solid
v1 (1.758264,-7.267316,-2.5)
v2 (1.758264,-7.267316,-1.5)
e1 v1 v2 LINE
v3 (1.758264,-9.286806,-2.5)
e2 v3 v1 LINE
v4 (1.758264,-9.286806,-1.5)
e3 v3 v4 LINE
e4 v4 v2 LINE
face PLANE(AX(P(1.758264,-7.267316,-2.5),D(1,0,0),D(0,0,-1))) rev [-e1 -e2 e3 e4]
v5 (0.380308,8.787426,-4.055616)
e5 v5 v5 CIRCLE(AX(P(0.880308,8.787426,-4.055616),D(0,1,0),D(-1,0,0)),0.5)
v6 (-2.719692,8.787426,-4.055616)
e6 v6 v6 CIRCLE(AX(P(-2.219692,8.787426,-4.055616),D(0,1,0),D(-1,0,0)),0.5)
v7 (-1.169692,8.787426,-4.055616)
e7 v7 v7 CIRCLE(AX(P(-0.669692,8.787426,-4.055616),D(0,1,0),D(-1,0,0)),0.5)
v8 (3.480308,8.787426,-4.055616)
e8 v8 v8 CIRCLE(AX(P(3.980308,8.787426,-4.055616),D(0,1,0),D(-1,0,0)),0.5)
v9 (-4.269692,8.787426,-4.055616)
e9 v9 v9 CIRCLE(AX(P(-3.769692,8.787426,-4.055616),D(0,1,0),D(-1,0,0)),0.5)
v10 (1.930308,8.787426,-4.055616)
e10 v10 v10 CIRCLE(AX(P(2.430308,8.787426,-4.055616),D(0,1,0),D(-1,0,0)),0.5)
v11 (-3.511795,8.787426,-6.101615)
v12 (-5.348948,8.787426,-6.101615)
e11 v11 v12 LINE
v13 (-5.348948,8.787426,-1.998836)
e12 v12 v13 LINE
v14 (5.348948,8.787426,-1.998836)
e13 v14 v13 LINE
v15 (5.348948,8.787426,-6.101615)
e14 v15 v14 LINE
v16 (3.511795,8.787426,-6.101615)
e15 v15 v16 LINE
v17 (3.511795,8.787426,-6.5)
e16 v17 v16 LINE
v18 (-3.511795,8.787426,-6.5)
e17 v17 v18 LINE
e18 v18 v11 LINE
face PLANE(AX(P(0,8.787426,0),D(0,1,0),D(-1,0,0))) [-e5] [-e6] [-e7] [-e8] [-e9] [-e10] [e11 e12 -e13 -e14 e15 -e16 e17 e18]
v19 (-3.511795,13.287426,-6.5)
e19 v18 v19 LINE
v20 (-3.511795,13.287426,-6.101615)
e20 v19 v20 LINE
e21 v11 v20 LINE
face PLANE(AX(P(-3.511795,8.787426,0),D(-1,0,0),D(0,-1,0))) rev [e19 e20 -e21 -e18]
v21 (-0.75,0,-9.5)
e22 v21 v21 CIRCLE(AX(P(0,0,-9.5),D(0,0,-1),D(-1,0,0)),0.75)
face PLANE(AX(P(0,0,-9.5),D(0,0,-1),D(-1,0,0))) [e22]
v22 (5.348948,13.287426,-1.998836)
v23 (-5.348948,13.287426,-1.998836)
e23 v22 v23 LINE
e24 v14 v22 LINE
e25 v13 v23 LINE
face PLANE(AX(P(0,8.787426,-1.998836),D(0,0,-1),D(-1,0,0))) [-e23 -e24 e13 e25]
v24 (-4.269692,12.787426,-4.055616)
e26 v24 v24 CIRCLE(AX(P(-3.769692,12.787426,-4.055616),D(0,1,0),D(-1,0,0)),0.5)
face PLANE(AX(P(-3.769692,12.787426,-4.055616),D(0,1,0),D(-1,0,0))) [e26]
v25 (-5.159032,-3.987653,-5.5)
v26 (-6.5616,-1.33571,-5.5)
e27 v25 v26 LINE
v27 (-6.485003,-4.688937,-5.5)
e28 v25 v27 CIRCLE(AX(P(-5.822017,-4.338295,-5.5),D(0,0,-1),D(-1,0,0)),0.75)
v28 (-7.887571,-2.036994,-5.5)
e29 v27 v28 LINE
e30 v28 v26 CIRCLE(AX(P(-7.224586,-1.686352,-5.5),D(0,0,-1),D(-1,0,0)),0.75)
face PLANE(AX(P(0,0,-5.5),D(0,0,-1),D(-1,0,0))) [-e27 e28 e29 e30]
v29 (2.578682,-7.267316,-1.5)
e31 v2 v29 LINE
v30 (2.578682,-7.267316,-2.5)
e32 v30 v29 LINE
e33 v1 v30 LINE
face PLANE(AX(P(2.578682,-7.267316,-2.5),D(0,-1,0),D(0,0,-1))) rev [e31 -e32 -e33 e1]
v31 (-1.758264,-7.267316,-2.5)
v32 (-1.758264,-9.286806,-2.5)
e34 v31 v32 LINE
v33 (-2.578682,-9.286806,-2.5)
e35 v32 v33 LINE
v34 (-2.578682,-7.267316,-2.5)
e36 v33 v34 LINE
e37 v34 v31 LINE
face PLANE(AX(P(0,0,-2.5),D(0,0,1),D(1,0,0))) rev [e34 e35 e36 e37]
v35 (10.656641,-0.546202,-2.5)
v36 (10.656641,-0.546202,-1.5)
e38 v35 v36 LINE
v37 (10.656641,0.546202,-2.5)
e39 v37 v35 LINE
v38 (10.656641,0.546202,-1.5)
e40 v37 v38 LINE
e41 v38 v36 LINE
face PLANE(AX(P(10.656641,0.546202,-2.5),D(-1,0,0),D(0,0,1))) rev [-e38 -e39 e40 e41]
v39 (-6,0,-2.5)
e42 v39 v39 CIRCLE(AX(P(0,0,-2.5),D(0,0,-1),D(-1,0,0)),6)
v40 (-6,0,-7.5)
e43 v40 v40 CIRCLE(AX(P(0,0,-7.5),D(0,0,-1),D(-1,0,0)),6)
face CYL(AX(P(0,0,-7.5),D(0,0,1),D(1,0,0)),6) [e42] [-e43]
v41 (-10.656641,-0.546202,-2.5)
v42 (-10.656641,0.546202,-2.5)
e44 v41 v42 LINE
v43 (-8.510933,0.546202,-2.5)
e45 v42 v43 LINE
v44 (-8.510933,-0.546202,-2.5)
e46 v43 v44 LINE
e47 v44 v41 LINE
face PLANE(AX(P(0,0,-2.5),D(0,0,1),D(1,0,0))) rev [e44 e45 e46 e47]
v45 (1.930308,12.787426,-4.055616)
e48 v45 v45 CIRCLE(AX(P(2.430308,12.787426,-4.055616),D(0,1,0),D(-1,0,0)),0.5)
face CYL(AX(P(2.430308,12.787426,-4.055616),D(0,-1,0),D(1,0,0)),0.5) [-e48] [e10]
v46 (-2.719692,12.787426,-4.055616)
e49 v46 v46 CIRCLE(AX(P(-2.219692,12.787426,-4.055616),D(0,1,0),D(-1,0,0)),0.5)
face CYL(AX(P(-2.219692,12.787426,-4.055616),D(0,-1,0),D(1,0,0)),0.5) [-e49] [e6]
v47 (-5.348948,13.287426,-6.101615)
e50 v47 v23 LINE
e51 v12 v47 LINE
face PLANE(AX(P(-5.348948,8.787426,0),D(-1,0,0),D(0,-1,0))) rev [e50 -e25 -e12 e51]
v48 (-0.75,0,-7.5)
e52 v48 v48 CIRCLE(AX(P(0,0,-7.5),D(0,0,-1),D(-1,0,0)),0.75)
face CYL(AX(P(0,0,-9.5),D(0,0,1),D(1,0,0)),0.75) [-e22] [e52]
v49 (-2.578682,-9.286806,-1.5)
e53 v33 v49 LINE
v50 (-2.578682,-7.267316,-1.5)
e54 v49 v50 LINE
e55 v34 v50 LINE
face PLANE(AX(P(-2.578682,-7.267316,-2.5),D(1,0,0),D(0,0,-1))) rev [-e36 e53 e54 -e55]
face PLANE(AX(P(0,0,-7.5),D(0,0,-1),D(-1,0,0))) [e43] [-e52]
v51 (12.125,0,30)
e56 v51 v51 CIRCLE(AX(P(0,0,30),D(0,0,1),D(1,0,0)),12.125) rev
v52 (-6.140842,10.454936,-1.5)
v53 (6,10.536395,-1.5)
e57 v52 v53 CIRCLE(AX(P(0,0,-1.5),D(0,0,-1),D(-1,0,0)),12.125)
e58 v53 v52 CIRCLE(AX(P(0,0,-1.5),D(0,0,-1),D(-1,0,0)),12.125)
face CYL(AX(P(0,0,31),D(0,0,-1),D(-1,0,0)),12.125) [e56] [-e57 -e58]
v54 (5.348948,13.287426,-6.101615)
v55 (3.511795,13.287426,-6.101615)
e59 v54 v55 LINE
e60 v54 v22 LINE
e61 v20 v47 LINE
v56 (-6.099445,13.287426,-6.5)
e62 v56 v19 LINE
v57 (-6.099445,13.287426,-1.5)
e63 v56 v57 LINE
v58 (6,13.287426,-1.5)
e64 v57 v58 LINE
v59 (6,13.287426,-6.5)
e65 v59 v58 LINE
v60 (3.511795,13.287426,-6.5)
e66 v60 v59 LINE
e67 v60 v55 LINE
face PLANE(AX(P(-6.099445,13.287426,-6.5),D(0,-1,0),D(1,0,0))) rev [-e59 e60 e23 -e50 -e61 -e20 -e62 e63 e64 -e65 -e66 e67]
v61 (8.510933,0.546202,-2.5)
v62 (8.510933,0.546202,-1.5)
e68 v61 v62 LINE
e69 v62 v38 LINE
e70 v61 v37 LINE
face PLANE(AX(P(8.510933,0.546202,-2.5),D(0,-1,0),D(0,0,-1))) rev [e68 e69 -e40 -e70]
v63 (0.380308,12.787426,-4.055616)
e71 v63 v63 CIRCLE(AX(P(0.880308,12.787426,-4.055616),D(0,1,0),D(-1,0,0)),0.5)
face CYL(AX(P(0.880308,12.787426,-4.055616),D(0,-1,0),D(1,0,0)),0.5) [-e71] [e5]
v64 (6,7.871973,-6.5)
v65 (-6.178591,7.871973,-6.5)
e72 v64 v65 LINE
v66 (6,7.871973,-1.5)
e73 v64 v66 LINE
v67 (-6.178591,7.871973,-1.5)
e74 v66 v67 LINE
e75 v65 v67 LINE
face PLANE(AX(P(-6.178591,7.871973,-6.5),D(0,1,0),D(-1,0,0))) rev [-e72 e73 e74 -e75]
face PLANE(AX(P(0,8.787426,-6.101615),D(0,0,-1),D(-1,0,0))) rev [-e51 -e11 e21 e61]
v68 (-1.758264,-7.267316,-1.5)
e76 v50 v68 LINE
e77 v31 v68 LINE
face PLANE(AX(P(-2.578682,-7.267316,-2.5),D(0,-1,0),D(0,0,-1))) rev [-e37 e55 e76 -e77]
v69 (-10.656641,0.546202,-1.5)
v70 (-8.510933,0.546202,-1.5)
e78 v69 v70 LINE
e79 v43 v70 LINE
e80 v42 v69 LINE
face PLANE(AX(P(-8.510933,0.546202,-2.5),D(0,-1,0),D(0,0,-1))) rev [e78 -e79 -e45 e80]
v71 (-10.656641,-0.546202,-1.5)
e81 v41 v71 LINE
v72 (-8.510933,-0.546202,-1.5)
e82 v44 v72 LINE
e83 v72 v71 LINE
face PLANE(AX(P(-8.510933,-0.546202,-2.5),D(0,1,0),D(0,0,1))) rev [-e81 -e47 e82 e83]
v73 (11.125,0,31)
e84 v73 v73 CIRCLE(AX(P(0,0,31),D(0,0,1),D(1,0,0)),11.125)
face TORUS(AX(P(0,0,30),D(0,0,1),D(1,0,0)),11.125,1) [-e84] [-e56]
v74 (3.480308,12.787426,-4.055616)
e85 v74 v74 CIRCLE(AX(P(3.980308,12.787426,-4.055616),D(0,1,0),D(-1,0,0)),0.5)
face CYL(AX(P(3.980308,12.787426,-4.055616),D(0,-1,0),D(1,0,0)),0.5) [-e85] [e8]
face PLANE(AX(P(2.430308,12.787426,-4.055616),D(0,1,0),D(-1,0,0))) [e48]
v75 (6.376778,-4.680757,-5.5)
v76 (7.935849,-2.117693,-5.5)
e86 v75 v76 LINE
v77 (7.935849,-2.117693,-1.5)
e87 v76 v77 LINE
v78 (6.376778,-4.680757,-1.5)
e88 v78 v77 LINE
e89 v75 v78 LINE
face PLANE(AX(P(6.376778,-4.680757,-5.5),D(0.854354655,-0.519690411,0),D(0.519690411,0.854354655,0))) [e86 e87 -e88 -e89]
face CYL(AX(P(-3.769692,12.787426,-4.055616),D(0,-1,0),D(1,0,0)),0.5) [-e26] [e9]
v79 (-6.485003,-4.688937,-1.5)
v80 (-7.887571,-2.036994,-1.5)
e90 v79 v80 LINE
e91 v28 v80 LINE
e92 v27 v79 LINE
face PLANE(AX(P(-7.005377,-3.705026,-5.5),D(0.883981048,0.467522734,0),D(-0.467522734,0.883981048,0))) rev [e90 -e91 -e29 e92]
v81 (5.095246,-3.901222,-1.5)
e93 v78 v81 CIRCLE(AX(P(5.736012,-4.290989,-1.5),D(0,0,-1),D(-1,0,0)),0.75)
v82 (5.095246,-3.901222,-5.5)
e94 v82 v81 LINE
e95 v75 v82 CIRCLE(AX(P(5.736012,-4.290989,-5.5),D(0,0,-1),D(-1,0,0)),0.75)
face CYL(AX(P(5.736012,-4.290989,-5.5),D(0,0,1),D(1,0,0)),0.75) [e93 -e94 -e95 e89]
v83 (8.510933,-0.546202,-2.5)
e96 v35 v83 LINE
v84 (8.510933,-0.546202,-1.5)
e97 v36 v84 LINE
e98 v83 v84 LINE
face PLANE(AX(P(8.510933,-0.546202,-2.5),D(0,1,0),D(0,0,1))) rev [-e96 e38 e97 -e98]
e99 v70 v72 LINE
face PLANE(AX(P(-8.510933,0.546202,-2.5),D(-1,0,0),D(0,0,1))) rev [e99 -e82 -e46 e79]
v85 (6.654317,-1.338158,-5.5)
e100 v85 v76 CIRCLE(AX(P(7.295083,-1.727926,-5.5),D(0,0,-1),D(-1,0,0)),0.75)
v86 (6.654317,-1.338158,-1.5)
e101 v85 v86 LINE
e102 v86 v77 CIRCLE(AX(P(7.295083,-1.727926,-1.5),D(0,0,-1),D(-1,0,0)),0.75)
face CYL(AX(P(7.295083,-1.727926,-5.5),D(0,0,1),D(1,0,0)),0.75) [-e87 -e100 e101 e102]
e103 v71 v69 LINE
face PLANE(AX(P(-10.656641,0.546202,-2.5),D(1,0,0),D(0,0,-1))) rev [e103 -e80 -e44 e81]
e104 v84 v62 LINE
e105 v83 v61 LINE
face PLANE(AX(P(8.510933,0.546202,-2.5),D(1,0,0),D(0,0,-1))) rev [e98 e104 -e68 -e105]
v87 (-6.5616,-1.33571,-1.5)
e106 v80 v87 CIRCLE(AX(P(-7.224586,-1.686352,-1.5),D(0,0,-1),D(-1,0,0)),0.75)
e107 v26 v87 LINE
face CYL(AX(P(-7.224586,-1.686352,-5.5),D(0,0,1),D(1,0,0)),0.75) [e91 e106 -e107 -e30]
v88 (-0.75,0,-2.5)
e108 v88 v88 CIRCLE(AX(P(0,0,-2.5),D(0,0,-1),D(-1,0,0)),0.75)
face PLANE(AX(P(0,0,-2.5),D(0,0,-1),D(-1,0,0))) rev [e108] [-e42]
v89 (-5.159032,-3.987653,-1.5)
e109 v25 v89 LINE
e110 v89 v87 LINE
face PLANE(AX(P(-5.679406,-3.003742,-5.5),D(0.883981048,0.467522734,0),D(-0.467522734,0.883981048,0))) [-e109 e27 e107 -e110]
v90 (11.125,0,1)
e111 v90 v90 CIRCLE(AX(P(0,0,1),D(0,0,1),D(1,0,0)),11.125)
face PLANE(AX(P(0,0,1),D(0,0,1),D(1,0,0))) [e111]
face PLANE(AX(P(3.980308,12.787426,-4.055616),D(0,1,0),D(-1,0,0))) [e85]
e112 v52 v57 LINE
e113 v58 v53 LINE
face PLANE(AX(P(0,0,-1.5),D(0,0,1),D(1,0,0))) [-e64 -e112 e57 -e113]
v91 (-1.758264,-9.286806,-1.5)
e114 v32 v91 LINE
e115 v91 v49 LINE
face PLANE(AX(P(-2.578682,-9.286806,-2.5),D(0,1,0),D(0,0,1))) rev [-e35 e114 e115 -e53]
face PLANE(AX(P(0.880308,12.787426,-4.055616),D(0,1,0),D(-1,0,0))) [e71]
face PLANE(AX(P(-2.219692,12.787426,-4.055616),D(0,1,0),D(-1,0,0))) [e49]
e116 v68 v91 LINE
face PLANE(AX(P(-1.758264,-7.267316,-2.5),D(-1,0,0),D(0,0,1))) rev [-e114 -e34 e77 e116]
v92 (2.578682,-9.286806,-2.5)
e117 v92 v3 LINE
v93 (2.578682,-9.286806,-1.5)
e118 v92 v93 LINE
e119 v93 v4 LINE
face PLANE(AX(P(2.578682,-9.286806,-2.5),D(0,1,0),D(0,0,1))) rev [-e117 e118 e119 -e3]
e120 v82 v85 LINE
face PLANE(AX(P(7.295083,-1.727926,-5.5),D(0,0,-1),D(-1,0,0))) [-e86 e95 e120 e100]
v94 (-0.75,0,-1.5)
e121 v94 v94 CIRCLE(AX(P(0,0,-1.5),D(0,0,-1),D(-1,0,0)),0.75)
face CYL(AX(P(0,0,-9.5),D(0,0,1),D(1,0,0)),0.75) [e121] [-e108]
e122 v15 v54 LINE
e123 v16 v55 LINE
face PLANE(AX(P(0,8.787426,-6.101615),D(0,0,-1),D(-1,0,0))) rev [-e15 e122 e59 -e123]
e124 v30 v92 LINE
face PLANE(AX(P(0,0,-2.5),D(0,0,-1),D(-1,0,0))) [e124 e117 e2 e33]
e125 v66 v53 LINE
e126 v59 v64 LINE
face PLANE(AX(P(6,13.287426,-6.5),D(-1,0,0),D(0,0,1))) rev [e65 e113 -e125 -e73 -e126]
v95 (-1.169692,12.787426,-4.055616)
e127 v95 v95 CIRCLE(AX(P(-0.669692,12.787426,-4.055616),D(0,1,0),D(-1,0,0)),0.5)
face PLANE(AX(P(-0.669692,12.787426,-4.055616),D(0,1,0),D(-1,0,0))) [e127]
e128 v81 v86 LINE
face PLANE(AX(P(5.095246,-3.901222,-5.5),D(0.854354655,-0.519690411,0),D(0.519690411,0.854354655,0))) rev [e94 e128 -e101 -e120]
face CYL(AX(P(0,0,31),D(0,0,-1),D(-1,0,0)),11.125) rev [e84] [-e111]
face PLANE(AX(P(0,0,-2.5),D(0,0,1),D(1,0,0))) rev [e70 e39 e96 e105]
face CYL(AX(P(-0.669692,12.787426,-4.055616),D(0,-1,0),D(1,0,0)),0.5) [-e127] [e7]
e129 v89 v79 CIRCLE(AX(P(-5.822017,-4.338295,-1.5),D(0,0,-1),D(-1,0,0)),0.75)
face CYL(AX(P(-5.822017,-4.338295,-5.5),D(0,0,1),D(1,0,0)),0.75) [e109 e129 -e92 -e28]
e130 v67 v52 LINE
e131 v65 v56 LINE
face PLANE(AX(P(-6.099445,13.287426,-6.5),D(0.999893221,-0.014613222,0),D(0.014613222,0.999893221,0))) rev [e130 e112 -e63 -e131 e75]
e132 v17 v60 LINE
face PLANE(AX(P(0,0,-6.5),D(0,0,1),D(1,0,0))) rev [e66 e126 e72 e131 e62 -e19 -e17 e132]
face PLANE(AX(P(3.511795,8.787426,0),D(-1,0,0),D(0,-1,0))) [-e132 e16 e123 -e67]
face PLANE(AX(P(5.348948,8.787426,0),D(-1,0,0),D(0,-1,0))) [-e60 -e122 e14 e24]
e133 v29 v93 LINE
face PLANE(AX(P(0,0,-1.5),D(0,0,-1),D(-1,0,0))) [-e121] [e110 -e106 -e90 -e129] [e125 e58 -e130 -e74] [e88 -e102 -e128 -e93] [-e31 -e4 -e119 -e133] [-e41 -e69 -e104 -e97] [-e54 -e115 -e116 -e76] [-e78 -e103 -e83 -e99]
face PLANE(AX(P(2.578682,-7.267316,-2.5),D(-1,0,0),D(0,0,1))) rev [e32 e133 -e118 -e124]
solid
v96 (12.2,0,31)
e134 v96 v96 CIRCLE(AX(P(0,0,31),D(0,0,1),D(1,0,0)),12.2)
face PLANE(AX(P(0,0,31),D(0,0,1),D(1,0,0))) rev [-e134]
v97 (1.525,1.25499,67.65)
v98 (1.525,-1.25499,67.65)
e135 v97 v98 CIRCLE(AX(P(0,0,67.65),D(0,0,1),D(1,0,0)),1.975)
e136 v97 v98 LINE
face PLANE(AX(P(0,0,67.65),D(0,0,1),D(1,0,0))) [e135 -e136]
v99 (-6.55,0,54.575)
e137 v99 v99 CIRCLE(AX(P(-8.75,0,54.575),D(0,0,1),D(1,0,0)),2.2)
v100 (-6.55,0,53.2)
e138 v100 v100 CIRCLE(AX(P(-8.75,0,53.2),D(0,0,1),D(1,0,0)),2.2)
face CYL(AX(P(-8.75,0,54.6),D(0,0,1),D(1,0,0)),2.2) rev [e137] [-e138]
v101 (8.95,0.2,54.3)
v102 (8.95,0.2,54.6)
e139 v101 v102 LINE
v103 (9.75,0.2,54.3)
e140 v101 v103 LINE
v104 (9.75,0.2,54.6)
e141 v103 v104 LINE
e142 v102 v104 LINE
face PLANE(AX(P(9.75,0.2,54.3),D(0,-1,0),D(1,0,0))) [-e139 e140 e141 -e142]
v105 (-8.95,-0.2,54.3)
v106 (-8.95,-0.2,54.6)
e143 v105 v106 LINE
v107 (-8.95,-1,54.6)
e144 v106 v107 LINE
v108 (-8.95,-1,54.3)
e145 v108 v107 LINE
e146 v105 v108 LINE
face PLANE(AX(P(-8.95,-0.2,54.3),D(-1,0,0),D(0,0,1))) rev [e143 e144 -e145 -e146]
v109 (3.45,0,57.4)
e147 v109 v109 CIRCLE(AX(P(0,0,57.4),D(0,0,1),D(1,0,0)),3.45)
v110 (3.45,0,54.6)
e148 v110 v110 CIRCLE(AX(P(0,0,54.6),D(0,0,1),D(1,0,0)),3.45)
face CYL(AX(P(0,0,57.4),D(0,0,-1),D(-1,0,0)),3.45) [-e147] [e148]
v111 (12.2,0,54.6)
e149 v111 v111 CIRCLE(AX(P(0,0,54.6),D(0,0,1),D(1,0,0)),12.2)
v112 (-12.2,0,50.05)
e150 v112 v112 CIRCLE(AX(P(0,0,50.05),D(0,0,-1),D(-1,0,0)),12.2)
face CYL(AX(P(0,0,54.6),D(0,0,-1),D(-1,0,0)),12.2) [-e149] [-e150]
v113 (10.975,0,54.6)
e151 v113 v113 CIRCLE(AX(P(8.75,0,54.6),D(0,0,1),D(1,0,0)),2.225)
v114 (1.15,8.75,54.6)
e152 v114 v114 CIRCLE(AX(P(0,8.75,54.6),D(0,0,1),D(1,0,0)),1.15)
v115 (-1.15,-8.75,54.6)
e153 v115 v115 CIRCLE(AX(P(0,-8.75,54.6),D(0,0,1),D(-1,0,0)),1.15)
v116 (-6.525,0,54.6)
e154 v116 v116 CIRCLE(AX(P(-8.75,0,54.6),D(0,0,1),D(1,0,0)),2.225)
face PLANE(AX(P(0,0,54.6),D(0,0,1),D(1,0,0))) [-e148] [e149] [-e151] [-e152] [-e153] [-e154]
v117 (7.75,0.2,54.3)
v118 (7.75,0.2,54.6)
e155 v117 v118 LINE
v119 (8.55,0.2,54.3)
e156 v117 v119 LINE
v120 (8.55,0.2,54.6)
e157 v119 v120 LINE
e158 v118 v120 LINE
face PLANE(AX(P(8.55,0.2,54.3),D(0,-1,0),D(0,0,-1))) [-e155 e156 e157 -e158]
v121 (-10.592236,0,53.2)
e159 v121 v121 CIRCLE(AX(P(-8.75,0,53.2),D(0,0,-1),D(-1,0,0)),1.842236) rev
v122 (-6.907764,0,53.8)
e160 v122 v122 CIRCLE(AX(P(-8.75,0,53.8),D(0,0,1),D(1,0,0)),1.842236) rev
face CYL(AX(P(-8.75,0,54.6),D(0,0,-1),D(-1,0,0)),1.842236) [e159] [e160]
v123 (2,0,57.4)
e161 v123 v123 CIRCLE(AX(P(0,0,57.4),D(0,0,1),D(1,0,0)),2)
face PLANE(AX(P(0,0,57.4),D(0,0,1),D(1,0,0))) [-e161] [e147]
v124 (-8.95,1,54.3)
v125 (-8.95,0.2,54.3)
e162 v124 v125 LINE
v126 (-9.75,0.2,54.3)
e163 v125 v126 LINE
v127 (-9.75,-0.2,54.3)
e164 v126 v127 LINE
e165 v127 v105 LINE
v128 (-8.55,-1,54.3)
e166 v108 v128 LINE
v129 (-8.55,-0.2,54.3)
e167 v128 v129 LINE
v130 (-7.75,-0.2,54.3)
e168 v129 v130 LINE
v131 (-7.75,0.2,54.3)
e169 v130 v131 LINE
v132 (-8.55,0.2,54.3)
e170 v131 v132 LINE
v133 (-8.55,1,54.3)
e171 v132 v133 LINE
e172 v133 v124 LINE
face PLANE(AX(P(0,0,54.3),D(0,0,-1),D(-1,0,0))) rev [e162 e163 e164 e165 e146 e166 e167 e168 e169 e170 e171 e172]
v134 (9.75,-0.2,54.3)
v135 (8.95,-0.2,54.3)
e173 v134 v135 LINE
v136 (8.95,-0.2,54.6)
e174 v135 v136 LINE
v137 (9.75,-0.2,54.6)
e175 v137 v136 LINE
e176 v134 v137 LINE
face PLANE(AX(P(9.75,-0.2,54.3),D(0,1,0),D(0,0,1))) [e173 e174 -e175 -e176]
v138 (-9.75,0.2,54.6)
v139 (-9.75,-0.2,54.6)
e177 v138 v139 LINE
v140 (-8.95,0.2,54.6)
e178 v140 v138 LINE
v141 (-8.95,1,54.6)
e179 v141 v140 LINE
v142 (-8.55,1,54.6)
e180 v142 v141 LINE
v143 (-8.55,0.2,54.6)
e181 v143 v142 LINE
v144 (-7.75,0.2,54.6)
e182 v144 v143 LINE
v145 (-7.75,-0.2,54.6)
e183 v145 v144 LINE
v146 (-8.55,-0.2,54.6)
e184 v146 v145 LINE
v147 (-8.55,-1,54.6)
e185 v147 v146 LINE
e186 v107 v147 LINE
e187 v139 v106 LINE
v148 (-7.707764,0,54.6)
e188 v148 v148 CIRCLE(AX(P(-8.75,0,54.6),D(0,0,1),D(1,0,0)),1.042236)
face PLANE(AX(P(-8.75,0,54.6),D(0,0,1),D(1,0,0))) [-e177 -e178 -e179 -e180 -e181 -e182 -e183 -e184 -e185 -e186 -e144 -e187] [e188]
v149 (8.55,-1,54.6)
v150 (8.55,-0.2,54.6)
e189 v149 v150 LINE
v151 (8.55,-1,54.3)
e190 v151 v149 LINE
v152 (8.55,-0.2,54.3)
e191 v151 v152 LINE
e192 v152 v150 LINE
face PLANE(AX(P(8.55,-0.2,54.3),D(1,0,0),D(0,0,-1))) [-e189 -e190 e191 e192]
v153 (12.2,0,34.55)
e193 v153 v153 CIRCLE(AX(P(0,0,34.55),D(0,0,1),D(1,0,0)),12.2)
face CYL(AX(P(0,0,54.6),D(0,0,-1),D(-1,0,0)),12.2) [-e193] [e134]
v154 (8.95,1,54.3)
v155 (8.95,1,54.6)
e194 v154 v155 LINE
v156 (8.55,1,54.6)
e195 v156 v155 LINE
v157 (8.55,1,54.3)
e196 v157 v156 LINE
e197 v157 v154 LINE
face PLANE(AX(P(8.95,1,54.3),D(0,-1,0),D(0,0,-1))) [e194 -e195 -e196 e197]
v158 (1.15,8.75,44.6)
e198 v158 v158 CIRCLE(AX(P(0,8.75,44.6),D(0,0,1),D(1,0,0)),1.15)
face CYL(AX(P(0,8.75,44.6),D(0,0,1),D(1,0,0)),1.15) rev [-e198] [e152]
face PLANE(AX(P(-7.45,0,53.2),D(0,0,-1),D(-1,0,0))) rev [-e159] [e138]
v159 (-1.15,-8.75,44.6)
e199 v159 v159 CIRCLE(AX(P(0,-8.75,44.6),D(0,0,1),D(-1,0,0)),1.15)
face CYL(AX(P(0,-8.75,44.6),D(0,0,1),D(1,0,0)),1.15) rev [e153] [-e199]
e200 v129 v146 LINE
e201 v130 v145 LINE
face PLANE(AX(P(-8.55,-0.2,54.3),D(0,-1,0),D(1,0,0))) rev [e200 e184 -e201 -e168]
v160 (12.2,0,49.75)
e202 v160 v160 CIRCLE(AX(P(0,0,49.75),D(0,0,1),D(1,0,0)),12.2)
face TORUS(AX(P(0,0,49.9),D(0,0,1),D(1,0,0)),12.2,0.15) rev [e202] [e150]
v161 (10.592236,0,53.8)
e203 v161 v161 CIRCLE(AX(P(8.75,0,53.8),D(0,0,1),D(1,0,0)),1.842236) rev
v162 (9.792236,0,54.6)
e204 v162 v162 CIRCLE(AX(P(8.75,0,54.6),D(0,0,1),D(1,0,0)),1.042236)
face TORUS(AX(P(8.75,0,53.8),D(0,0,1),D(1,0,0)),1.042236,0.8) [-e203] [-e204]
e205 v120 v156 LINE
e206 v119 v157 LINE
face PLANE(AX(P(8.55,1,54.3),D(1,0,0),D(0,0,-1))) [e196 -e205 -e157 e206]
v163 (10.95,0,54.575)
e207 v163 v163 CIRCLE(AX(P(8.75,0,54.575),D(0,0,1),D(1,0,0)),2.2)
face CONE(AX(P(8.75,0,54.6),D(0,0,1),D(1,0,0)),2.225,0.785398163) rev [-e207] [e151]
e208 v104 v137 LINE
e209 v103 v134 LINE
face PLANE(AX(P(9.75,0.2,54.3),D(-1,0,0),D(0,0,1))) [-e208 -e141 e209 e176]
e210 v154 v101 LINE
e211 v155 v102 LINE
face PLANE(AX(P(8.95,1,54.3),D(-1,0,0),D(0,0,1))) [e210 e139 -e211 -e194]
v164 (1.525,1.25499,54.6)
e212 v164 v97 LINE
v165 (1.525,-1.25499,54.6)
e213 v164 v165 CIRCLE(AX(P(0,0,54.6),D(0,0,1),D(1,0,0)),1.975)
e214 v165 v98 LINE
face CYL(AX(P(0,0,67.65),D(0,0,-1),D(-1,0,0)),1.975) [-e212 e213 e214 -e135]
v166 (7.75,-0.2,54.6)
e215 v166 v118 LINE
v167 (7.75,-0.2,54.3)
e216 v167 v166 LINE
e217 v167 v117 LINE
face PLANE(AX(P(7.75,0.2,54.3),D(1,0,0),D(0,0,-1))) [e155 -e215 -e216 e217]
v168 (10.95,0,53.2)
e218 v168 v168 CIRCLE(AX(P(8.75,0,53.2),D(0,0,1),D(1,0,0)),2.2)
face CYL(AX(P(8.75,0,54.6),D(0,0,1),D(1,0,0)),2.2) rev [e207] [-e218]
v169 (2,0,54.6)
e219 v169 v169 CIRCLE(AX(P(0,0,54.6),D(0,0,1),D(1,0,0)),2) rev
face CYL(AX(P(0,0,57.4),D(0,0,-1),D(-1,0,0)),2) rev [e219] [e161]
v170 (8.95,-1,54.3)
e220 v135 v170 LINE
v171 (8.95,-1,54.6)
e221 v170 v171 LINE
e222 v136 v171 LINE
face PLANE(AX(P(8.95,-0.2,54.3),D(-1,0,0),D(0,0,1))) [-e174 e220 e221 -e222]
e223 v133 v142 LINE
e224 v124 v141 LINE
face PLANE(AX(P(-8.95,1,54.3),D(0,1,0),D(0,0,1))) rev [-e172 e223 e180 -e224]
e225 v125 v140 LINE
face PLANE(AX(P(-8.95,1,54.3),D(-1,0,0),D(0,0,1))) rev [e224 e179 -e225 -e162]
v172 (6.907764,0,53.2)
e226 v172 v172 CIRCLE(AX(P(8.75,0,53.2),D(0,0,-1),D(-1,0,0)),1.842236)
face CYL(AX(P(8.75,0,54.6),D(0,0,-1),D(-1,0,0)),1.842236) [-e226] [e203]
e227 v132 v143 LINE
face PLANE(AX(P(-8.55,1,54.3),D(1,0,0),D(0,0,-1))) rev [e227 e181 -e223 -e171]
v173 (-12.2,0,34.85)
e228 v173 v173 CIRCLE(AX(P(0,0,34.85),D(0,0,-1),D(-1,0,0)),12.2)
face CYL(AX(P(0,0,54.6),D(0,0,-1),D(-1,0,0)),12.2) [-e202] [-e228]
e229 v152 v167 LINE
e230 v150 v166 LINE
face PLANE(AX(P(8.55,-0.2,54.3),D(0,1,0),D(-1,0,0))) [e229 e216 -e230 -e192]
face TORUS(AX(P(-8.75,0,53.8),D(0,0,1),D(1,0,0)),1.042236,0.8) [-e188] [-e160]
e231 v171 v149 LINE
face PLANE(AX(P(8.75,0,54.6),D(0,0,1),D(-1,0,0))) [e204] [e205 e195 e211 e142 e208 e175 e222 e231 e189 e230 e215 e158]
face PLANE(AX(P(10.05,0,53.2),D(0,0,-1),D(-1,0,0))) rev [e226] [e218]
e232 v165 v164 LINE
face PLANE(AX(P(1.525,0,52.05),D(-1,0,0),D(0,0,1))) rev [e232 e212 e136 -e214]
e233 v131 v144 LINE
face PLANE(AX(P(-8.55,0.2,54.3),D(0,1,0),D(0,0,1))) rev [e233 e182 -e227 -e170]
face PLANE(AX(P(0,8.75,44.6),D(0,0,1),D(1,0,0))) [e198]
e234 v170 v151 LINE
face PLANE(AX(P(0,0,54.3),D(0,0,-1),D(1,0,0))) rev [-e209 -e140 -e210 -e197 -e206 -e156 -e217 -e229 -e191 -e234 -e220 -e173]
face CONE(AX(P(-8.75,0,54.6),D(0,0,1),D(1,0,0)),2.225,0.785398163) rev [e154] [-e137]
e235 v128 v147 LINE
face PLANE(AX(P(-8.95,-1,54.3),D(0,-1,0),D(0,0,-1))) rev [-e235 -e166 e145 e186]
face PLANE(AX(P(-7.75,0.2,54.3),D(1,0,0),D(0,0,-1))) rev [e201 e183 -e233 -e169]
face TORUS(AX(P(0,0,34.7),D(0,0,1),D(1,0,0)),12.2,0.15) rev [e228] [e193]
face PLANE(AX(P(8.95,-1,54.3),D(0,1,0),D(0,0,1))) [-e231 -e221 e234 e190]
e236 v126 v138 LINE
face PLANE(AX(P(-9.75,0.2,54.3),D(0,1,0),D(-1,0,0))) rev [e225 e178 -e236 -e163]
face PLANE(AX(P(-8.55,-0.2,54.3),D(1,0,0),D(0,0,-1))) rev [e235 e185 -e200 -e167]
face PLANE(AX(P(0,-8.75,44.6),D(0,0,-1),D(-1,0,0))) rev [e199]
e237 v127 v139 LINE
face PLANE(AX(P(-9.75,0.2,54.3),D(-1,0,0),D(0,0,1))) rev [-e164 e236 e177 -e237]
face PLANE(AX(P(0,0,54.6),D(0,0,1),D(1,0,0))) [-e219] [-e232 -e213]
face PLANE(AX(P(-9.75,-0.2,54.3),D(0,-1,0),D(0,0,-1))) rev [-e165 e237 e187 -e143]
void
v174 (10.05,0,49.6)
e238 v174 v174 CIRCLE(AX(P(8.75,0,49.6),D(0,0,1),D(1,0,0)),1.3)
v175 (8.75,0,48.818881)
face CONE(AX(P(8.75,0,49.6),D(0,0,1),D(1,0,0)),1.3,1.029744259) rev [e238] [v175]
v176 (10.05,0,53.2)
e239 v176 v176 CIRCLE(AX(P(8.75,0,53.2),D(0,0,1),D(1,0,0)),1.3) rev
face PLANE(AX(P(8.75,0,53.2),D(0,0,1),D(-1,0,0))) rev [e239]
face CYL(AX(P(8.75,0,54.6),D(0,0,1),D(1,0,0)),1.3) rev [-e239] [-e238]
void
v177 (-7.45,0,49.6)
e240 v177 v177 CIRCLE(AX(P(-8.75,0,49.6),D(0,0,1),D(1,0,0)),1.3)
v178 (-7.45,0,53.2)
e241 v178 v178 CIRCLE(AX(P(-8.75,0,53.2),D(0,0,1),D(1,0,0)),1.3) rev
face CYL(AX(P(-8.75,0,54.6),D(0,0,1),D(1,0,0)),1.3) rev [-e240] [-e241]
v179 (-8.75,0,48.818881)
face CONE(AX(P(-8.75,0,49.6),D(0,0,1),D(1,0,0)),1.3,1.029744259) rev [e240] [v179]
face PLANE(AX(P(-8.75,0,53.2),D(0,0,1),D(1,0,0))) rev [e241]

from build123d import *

# Parameters (mm, degrees)
SKETCH1_R                                  = 12.125
BOSS_EXTRUDE1_DEPTH                        = 31
FILLET2_R                                  = 1
SHELL1_START                               = 1
SHELL1_OUTLINE_R                           = 11.125
SHELL1_DEPTH                               = 30
SKETCH11_R                                 = 12.2
BOSS_EXTRUDE4_DEPTH                        = 23.6
SKETCH12_R                                 = 3.45
SKETCH12_R_2                               = 2
BOSS_EXTRUDE5_DEPTH                        = 2.8
SKETCH14_R                                 = 1.975
BOSS_EXTRUDE6_DEPTH                        = 13.05
CUT_EXTRUDE5_DEPTH                         = 13.05
SKETCH17_R                                 = 0.15
SKETCH18_R                                 = 1.15
CUT_EXTRUDE7_DEPTH                         = 10
CBORE_FOR_M2_CHEESE_HEAD_SCREW1_AT_2_COUNT = 2
CBORE_FOR_M2_CHEESE_HEAD_SCREW1_AT_2_PITCH = 17.5
SKETCH24_R                                 = 1.842235559
BOSS_EXTRUDE7_DEPTH                        = 1.4
CUT_EXTRUDE9_DEPTH                         = 0.3
FILLET3_R                                  = 0.8
FILLET3_OF_MIRROR2_R                       = 0.8
BOSS_EXTRUDE8_START                        = 1.5
SKETCH26_R                                 = 12.125
BOSS_EXTRUDE8_DEPTH                        = 1.5
BOSS_EXTRUDE9_START                        = 1
SKETCH27_R                                 = 6
BOSS_EXTRUDE9_DEPTH                        = 5
SKETCH28_R                                 = 0.75
BOSS_EXTRUDE10_DEPTH                       = 8
BOSS_EXTRUDE11_DEPTH                       = 5
SKETCH31_W                                 = 7.02358916
SKETCH31_H                                 = 2.353363912
SKETCH31_H_2                               = 0.39838489
CUT_EXTRUDE10_DEPTH                        = 4.5
SKETCH32_R                                 = 0.5
BOSS_EXTRUDE12_DEPTH                       = 4
BOSS_EXTRUDE13_DEPTH                       = 4
SKETCH33_4_W                               = 2.145707953
SKETCH33_4_H                               = 1.092403472
SKETCH33_4_W_2                             = 0.820417747
SKETCH33_4_H_2                             = 2.019489838
BOSS_EXTRUDE14_DEPTH                       = 1


# Read off the part's stored shape, not the designer's step: Shell1
with BuildPart() as part:
    # Sketch1 → Boss-Extrude1 (new body)
    with BuildSketch(Plane.XY):
        Circle(SKETCH1_R)
    extrude(amount=BOSS_EXTRUDE1_DEPTH)

    # Fillet2
    fillet2_edges = [part.edges().sort_by_distance(p)[0] for p in [
        (-12.125, 0, 31),
    ]]
    fillet(fillet2_edges, radius=FILLET2_R)

    # Shell1 outline → Shell1 (cut)
    with BuildSketch(Plane.XY.offset(SHELL1_START)):
        Circle(SHELL1_OUTLINE_R)
    extrude(amount=SHELL1_DEPTH, mode=Mode.SUBTRACT)

    # Sketch26 → Boss-Extrude8 (add)
    with BuildSketch(Plane(origin=(0, 0, 0), x_dir=(-1, 0, 0), z_dir=(0, 0, -1)).offset(BOSS_EXTRUDE8_START)):
        Circle(SKETCH26_R)
    extrude(amount=-BOSS_EXTRUDE8_DEPTH)



with BuildPart() as body_2:
    # Sketch11 → Boss-Extrude4 (new body)
    with BuildSketch(Plane.XY.offset(31)):
        Circle(SKETCH11_R)
    extrude(amount=BOSS_EXTRUDE4_DEPTH)

    # Sketch12 → Boss-Extrude5 (add)
    with BuildSketch(Plane.XY.offset(54.6)):
        Circle(SKETCH12_R)
        Circle(SKETCH12_R_2, mode=Mode.SUBTRACT)
    extrude(amount=BOSS_EXTRUDE5_DEPTH)

    # Sketch14 → Boss-Extrude6 (add)
    with BuildSketch(Plane.XY.offset(54.6)):
        Circle(SKETCH14_R)
    extrude(amount=BOSS_EXTRUDE6_DEPTH)

    # Sketch16 → Cut-Extrude5 (cut)
    with BuildSketch(Plane.XY.offset(67.65)):
        with BuildLine():
            Line((1.525, 0), (1.525, 1.25499004))
            ThreePointArc((1.525, 1.25499004), (1.975, 0), (1.525, -1.25499004))
            Line((1.525, -1.25499004), (1.525, 0))
        make_face()
    extrude(amount=-CUT_EXTRUDE5_DEPTH, mode=Mode.SUBTRACT)

    # Sketch17 → Cut-Revolve1 (revolve, cut)
    with BuildSketch(Plane(origin=(0, 0, 0), x_dir=(1, 0, 0), z_dir=(0, 1, 0))):
        with Locations((-12.2, -49.9)):
            Circle(SKETCH17_R)
        with Locations((-12.2, -34.7)):
            Circle(SKETCH17_R)
    revolve(axis=Axis((0, 0, 54.6), (0, 0, -1)), mode=Mode.SUBTRACT)

    # Sketch18 → Cut-Extrude7 (cut)
    with BuildSketch(Plane.XY.offset(54.6)):
        with Locations((0, 8.75)):
            Circle(SKETCH18_R)
        with Locations(Location((0, -8.75, 0), (0, 0, 180))):
            Circle(SKETCH18_R)
    extrude(amount=-CUT_EXTRUDE7_DEPTH, mode=Mode.SUBTRACT)

    # Sketch23 → CBORE for M2 Cheese Head Screw1 (revolve, cut)
    with BuildSketch(Plane(origin=(-8.75, 0, 54.6), x_dir=(0, -1, 0), z_dir=(1, 0, 0))):
        Polygon((0, 0), (0, 5.781118805), (1.3, 5), (1.3, 1.4), (2.2, 1.4), (2.2, 0.025), (2.225, 0), align=None)
    cbore_for_m2_cheese_head_screw1 = revolve(axis=Axis((-8.75, 0, 60.95), (0, 0, -1)), mode=Mode.SUBTRACT)

    # CBORE for M2 Cheese Head Screw1 at 2: CBORE for M2 Cheese Head Screw1 ×2
    with Locations(*[(i * CBORE_FOR_M2_CHEESE_HEAD_SCREW1_AT_2_PITCH, 0, 0) for i in range(1, CBORE_FOR_M2_CHEESE_HEAD_SCREW1_AT_2_COUNT)]):
        add(cbore_for_m2_cheese_head_screw1, mode=Mode.SUBTRACT)

    # Sketch24 → Boss-Extrude7 (add)
    with BuildSketch(Plane.XY.offset(53.2)):
        with Locations(Location((-8.75, 0, 0), (0, 0, 180))):
            Circle(SKETCH24_R)
    boss_extrude7 = extrude(amount=BOSS_EXTRUDE7_DEPTH)

    # Sketch25 → Cut-Extrude9 (cut)
    with BuildSketch(Plane.XY.offset(54.6)):
        Polygon((-8.55, 0.2), (-7.75, 0.2), (-7.75, -0.2), (-8.55, -0.2), (-8.55, -1), (-8.95, -1), (-8.95, -0.2), (-9.75, -0.2), (-9.75, 0.2), (-8.95, 0.2), (-8.95, 1), (-8.55, 1), align=None)
    cut_extrude9 = extrude(amount=-CUT_EXTRUDE9_DEPTH, mode=Mode.SUBTRACT)

    # Fillet3
    fillet3_edges = [body_2.edges().sort_by_distance(p)[0] for p in [
        (-6.907764441, 0, 54.6),
    ]]
    fillet(fillet3_edges, radius=FILLET3_R)

    # Mirror2: Boss-Extrude7, Cut-Extrude9 across plane
    add(boss_extrude7.mirror(Plane(origin=(0, 0, 0), x_dir=(0, 0, 1), z_dir=(1, 0, 0))))
    add(cut_extrude9.mirror(Plane(origin=(0, 0, 0), x_dir=(0, 0, 1), z_dir=(1, 0, 0))), mode=Mode.SUBTRACT)

    # Fillet3 of Mirror2
    fillet3_of_mirror2_edges = [body_2.edges().sort_by_distance(p)[0] for p in [
        (6.907764441, 0, 54.6),
    ]]
    fillet(fillet3_of_mirror2_edges, radius=FILLET3_OF_MIRROR2_R)


with BuildPart() as body_3:
    # Sketch27 → Boss-Extrude9 (new body)
    with BuildSketch(Plane(origin=(0, 0, -1.5), x_dir=(-1, 0, 0), z_dir=(0, 0, -1)).offset(BOSS_EXTRUDE9_START)):
        Circle(SKETCH27_R)
    extrude(amount=BOSS_EXTRUDE9_DEPTH)


with BuildPart() as part_1:
    add(part.part)

    add(body_3.part)  # Boss-Extrude10 merges body 3
    # Sketch28 → Boss-Extrude10 (add)
    with BuildSketch(Plane(origin=(0, 0, -1.5), x_dir=(-1, 0, 0), z_dir=(0, 0, -1))):
        Circle(SKETCH28_R)
    extrude(amount=BOSS_EXTRUDE10_DEPTH)

    # Sketch29 → Boss-Extrude11 (add)
    with BuildSketch(Plane(origin=(0, 0, -1.5), x_dir=(-1, 0, 0), z_dir=(0, 0, -1))):
        Polygon((6.099445351, 13.287426403), (-6, 13.287426403), (-6, 7.871973463), (6.178591018, 7.871973463), align=None)
    extrude(amount=BOSS_EXTRUDE11_DEPTH)

    # Sketch31 → Cut-Extrude10 (cut)
    with BuildSketch(Plane(origin=(0, 13.287426403, 0), x_dir=(1, 0, 0), z_dir=(0, 1, 0))):
        Polygon((5.348948358, 1.998835879), (5.348948358, 6.10161511), (3.51179458, 6.10161511), (3.51179458, 3.748251198), (-3.51179458, 3.748251198), (-3.51179458, 6.10161511), (-5.348948358, 6.10161511), (-5.348948358, 1.998835879), align=None)
        with Locations((0, 4.924933154)):
            Rectangle(SKETCH31_W, SKETCH31_H)
        with Locations((0, 6.300807555)):
            Rectangle(SKETCH31_W, SKETCH31_H_2)
    extrude(amount=-CUT_EXTRUDE10_DEPTH, mode=Mode.SUBTRACT)

    # Sketch32 → Boss-Extrude12 (add)
    with BuildSketch(Plane(origin=(0, 8.787426403, 0), x_dir=(1, 0, 0), z_dir=(0, 1, 0))):
        with Locations(Location((3.980307899, 4.055615649, 0), (0, 0, 180))):
            Circle(SKETCH32_R)
        with Locations(Location((2.430307899, 4.055615649, 0), (0, 0, 180))):
            Circle(SKETCH32_R)
        with Locations(Location((0.880307899, 4.055615649, 0), (0, 0, 180))):
            Circle(SKETCH32_R)
        with Locations(Location((-0.669692101, 4.055615649, 0), (0, 0, 180))):
            Circle(SKETCH32_R)
        with Locations(Location((-2.219692101, 4.055615649, 0), (0, 0, 180))):
            Circle(SKETCH32_R)
        with Locations(Location((-3.769692101, 4.055615649, 0), (0, 0, 180))):
            Circle(SKETCH32_R)
    extrude(amount=BOSS_EXTRUDE12_DEPTH)

    # Sketch33 → Boss-Extrude13 (add)
    with BuildSketch(Plane(origin=(0, 0, -1.5), x_dir=(-1, 0, 0), z_dir=(0, 0, -1))):
        with BuildLine():
            Line((6.485003155, -4.688937379), (7.887571356, -2.036994234))
            ThreePointArc((7.887571356, -2.036994234), (7.57522762, -1.023366398), (6.561599784, -1.335710134))
            Line((6.561599784, -1.335710134), (5.159031583, -3.987653278))
            ThreePointArc((5.159031583, -3.987653278), (5.471375319, -5.001281114), (6.485003155, -4.688937379))
        make_face()
        with BuildLine():
            ThreePointArc((-6.654317468, -1.338157716), (-7.684851268, -1.087159533), (-7.935849451, -2.117693332))
            Line((-7.935849451, -2.117693332), (-6.376778219, -4.680757298))
            ThreePointArc((-6.376778219, -4.680757298), (-5.34624442, -4.931755482), (-5.095246236, -3.901221682))
            Line((-5.095246236, -3.901221682), (-6.654317468, -1.338157716))
        make_face()
    extrude(amount=BOSS_EXTRUDE13_DEPTH)

    # Sketch33<4> → Boss-Extrude14 (add)
    with BuildSketch(Plane(origin=(0, 0, -1.5), x_dir=(-1, 0, 0), z_dir=(0, 0, -1))):
        with BuildLine():
            Line((5.159031583, -3.987653278), (6.561599784, -1.335710134))
            ThreePointArc((6.561599784, -1.335710134), (7.57522762, -1.023366398), (7.887571356, -2.036994234))
            Line((7.887571356, -2.036994234), (6.485003155, -4.688937379))
            ThreePointArc((6.485003155, -4.688937379), (5.471375319, -5.001281114), (5.159031583, -3.987653278))
        make_face()
        with BuildLine():
            Line((-6.376778219, -4.680757298), (-7.935849451, -2.117693332))
            ThreePointArc((-7.935849451, -2.117693332), (-7.684851268, -1.087159533), (-6.654317468, -1.338157716))
            Line((-6.654317468, -1.338157716), (-5.095246236, -3.901221682))
            ThreePointArc((-5.095246236, -3.901221682), (-5.34624442, -4.931755482), (-6.376778219, -4.680757298))
        make_face()
        with Locations((-9.583787275, 0)):
            Rectangle(SKETCH33_4_W, SKETCH33_4_H)
        with Locations((9.583787275, 0)):
            Rectangle(SKETCH33_4_W, SKETCH33_4_H)
        with Locations((2.168473025, -8.277061273)):
            Rectangle(SKETCH33_4_W_2, SKETCH33_4_H_2)
        with Locations((-2.168473025, -8.277061273)):
            Rectangle(SKETCH33_4_W_2, SKETCH33_4_H_2)
    extrude(amount=BOSS_EXTRUDE14_DEPTH)


solid = Compound([body_2.part, part_1.part])
